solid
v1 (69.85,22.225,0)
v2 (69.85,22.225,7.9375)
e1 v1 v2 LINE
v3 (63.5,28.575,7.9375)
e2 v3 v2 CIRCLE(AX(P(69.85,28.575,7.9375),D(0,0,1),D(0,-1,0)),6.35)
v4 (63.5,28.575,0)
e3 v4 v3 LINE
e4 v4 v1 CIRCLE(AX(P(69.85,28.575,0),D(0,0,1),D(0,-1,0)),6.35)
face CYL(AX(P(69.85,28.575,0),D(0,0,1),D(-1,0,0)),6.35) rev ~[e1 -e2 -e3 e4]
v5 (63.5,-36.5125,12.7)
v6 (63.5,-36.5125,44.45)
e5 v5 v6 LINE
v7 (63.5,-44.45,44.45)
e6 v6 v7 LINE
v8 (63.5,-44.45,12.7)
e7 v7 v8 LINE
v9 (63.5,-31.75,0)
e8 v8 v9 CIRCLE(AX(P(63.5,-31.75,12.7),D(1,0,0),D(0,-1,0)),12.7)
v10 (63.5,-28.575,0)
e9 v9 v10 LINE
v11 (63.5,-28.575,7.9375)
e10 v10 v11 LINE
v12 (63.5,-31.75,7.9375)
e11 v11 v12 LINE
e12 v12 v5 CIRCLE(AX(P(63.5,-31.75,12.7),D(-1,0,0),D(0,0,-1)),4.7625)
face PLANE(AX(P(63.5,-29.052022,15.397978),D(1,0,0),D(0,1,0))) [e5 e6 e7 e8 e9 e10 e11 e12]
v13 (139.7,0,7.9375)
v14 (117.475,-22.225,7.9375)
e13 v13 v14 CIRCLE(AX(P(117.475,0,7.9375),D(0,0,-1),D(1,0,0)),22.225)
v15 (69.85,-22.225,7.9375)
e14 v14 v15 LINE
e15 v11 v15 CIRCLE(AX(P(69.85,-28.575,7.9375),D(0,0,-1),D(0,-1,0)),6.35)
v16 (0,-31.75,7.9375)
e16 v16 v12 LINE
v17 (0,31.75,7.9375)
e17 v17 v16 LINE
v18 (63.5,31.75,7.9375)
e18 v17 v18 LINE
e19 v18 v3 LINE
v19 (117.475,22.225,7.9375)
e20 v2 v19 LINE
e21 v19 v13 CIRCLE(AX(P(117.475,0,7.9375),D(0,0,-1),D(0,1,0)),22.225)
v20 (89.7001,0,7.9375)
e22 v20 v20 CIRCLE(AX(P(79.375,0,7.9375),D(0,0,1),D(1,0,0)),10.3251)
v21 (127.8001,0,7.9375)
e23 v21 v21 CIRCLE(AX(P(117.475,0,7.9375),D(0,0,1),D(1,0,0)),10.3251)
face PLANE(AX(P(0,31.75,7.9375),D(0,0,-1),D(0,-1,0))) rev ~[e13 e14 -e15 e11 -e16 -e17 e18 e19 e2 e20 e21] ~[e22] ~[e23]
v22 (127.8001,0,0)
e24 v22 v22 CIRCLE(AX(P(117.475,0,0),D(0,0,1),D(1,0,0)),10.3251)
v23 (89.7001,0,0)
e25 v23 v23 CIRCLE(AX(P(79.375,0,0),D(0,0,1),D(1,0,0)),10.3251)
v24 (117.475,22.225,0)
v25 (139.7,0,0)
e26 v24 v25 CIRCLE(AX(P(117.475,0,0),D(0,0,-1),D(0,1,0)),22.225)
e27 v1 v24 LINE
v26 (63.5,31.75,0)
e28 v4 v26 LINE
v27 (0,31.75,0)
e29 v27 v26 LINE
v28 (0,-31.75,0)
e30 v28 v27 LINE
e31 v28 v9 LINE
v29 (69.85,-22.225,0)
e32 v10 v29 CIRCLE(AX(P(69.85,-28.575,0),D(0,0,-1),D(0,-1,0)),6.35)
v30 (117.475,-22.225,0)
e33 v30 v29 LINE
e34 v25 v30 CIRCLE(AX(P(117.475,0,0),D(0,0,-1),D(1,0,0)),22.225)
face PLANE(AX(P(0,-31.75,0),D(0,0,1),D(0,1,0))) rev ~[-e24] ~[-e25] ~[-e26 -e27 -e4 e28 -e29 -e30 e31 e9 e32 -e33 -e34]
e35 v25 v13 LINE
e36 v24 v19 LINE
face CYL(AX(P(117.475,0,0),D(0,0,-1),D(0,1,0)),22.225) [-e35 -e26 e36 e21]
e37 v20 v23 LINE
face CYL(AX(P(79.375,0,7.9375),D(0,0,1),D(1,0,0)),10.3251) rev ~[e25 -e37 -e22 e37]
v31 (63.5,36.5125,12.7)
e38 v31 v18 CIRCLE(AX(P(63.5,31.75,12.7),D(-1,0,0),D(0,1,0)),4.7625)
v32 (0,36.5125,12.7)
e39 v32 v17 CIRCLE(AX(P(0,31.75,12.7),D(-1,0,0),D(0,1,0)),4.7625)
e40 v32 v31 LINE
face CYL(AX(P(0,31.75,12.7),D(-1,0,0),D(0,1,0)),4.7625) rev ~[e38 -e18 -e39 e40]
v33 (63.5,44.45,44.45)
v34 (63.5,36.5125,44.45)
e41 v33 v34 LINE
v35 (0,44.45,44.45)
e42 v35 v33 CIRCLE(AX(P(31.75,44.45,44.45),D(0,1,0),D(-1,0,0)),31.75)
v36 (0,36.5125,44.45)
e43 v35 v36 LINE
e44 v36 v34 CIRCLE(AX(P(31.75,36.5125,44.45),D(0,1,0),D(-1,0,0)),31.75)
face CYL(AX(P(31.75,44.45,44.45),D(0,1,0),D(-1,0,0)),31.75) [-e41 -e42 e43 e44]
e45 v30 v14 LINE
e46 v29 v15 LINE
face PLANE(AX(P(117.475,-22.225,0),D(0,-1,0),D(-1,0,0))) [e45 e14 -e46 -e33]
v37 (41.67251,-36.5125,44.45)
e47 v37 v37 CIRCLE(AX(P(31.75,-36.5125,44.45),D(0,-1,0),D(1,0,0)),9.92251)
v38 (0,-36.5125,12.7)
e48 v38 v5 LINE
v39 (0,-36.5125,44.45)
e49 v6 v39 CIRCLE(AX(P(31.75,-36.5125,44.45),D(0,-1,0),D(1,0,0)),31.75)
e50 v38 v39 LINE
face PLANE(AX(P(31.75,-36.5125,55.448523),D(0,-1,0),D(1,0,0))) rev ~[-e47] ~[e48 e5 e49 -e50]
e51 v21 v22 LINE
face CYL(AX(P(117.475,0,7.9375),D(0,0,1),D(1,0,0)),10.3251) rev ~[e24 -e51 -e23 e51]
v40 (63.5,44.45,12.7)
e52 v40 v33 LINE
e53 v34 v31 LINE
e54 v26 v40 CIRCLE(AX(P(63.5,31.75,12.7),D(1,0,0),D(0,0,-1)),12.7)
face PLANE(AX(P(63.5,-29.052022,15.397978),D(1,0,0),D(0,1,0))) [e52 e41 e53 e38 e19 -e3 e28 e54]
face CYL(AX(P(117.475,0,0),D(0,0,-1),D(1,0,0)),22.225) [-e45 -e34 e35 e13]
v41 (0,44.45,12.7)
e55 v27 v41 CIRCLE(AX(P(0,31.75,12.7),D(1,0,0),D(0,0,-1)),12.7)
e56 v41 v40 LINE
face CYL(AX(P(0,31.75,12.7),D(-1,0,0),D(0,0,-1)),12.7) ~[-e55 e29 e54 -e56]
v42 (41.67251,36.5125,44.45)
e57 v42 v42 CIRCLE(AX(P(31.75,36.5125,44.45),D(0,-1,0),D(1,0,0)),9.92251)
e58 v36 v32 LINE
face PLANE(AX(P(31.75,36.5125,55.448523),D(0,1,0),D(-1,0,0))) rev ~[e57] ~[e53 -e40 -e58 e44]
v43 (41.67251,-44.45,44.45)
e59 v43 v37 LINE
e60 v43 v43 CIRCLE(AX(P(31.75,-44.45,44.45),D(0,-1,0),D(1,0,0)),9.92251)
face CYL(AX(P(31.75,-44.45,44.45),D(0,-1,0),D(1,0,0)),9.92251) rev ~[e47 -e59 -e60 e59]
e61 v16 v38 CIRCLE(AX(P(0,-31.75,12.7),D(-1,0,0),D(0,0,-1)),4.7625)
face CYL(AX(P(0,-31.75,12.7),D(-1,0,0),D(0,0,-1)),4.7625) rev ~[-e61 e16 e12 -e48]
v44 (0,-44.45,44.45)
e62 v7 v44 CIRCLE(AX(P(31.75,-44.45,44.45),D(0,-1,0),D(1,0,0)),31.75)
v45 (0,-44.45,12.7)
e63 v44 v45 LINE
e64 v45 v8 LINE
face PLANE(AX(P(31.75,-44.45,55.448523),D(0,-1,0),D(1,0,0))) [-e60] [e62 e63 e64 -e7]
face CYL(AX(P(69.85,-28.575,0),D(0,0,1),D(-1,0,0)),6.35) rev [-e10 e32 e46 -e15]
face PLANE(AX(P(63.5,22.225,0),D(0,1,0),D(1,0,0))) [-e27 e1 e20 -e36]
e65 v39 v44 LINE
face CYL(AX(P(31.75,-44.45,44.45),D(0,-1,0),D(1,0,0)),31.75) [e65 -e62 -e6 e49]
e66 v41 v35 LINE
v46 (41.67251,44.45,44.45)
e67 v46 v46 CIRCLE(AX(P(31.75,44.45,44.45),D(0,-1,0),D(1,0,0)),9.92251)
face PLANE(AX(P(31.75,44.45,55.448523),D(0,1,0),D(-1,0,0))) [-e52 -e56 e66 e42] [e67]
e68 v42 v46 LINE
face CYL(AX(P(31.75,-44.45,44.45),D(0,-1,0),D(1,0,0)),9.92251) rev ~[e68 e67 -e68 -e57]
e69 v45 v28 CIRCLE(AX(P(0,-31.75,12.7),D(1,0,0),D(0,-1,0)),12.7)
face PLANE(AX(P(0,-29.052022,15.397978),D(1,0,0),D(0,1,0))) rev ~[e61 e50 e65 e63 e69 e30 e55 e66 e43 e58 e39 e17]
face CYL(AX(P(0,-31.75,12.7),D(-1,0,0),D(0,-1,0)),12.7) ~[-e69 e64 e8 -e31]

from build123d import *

# Parameters (mm, degrees)
F1_DEPTH  = 63.5
F3_DEPTH  = 7.9375
F5_DEPTH  = 7.9375
F7_DEPTH  = 7.9375
F8_R      = 6.35
F9_R      = 9.92251
F10_DEPTH = 88.901
F11_R     = 10.3251
F12_DEPTH = 7.9385


with BuildPart() as f1:
    # F0 (on Right) → F1 (new body)
    with BuildSketch(Plane.YZ):
        with BuildLine():
            Line((-36.5125, 44.45), (-44.45, 44.45))
            Line((-44.45, 44.45), (-44.45, 12.7))
            ThreePointArc((-44.45, 12.7), (-40.7302561211, 3.7197438789), (-31.75, 0))
            Line((-31.75, 0), (0, 0))
            Line((0, 0), (0, 7.9375))
            Line((0, 7.9375), (-31.75, 7.9375))
            ThreePointArc((-31.75, 7.9375), (-35.1175960454, 9.3324039546), (-36.5125, 12.7))
            Line((-36.5125, 12.7), (-36.5125, 44.45))
        make_face()
        with BuildLine():
            Line((0, 7.9375), (0, 0))
            Line((0, 0), (31.75, 0))
            ThreePointArc((31.75, 0), (40.7302561211, 3.7197438789), (44.45, 12.7))
            Line((44.45, 12.7), (44.45, 44.45))
            Line((44.45, 44.45), (36.5125, 44.45))
            Line((36.5125, 44.45), (36.5125, 12.7))
            ThreePointArc((36.5125, 12.7), (35.1175960454, 9.3324039546), (31.75, 7.9375))
            Line((31.75, 7.9375), (0, 7.9375))
        make_face()
    extrude(amount=F1_DEPTH)

    # F2 (on face) → F3 (join, through all)
    with BuildSketch(Plane.XZ.offset(44.45)):
        with BuildLine():
            Line((0, 44.45), (63.5, 44.45))
            ThreePointArc((63.5, 44.45), (31.75, 76.2), (0, 44.45))
        make_face()
    extrude(amount=-F3_DEPTH)

    # F4 (on face) → F5 (join, through all)
    with BuildSketch(Plane(origin=(0, 44.45, 0), x_dir=(-1, 0, 0), z_dir=(0, 1, 0))):
        with BuildLine():
            ThreePointArc((0, 44.45), (-31.75, 76.2), (-63.5, 44.45))
            Line((-63.5, 44.45), (0, 44.45))
        make_face()
    extrude(amount=-F5_DEPTH)

    # F6 (on face) → F7 (join, through all)
    with BuildSketch(Plane(origin=(0, 0, 0), x_dir=(1, 0, 0), z_dir=(0, 0, -1))):
        with BuildLine():
            Line((63.5, 22.225), (63.5, -22.225))
            Line((63.5, -22.225), (117.475, -22.225))
            ThreePointArc((117.475, -22.225), (133.1904482119, -15.7154482119), (139.7, 0))
            ThreePointArc((139.7, 0), (133.1904482119, 15.7154482119), (117.475, 22.225))
            Line((117.475, 22.225), (63.5, 22.225))
        make_face()
    extrude(amount=-F7_DEPTH)

    # F8
    f8_edges = [f1.edges().sort_by_distance(p)[0] for p in [
        (63.5, -22.225, 3.96875),
        (63.5, 22.225, 3.96875),
    ]]
    fillet(f8_edges, radius=F8_R)

    # F9 (on face) → F10 (cut, through all)
    with BuildSketch(Plane.XZ.offset(44.45)):
        with Locations((31.75, 44.45)):
            Circle(F9_R)
    extrude(amount=-F10_DEPTH, mode=Mode.SUBTRACT)

    # F11 (on face) → F12 (cut, through all)
    with BuildSketch(Plane.XY.offset(7.9375)):
        with Locations((117.475, 0)):
            Circle(F11_R)
        with Locations((79.375, 0)):
            Circle(F11_R)
    extrude(amount=-F12_DEPTH, mode=Mode.SUBTRACT)


solid = f1.part
